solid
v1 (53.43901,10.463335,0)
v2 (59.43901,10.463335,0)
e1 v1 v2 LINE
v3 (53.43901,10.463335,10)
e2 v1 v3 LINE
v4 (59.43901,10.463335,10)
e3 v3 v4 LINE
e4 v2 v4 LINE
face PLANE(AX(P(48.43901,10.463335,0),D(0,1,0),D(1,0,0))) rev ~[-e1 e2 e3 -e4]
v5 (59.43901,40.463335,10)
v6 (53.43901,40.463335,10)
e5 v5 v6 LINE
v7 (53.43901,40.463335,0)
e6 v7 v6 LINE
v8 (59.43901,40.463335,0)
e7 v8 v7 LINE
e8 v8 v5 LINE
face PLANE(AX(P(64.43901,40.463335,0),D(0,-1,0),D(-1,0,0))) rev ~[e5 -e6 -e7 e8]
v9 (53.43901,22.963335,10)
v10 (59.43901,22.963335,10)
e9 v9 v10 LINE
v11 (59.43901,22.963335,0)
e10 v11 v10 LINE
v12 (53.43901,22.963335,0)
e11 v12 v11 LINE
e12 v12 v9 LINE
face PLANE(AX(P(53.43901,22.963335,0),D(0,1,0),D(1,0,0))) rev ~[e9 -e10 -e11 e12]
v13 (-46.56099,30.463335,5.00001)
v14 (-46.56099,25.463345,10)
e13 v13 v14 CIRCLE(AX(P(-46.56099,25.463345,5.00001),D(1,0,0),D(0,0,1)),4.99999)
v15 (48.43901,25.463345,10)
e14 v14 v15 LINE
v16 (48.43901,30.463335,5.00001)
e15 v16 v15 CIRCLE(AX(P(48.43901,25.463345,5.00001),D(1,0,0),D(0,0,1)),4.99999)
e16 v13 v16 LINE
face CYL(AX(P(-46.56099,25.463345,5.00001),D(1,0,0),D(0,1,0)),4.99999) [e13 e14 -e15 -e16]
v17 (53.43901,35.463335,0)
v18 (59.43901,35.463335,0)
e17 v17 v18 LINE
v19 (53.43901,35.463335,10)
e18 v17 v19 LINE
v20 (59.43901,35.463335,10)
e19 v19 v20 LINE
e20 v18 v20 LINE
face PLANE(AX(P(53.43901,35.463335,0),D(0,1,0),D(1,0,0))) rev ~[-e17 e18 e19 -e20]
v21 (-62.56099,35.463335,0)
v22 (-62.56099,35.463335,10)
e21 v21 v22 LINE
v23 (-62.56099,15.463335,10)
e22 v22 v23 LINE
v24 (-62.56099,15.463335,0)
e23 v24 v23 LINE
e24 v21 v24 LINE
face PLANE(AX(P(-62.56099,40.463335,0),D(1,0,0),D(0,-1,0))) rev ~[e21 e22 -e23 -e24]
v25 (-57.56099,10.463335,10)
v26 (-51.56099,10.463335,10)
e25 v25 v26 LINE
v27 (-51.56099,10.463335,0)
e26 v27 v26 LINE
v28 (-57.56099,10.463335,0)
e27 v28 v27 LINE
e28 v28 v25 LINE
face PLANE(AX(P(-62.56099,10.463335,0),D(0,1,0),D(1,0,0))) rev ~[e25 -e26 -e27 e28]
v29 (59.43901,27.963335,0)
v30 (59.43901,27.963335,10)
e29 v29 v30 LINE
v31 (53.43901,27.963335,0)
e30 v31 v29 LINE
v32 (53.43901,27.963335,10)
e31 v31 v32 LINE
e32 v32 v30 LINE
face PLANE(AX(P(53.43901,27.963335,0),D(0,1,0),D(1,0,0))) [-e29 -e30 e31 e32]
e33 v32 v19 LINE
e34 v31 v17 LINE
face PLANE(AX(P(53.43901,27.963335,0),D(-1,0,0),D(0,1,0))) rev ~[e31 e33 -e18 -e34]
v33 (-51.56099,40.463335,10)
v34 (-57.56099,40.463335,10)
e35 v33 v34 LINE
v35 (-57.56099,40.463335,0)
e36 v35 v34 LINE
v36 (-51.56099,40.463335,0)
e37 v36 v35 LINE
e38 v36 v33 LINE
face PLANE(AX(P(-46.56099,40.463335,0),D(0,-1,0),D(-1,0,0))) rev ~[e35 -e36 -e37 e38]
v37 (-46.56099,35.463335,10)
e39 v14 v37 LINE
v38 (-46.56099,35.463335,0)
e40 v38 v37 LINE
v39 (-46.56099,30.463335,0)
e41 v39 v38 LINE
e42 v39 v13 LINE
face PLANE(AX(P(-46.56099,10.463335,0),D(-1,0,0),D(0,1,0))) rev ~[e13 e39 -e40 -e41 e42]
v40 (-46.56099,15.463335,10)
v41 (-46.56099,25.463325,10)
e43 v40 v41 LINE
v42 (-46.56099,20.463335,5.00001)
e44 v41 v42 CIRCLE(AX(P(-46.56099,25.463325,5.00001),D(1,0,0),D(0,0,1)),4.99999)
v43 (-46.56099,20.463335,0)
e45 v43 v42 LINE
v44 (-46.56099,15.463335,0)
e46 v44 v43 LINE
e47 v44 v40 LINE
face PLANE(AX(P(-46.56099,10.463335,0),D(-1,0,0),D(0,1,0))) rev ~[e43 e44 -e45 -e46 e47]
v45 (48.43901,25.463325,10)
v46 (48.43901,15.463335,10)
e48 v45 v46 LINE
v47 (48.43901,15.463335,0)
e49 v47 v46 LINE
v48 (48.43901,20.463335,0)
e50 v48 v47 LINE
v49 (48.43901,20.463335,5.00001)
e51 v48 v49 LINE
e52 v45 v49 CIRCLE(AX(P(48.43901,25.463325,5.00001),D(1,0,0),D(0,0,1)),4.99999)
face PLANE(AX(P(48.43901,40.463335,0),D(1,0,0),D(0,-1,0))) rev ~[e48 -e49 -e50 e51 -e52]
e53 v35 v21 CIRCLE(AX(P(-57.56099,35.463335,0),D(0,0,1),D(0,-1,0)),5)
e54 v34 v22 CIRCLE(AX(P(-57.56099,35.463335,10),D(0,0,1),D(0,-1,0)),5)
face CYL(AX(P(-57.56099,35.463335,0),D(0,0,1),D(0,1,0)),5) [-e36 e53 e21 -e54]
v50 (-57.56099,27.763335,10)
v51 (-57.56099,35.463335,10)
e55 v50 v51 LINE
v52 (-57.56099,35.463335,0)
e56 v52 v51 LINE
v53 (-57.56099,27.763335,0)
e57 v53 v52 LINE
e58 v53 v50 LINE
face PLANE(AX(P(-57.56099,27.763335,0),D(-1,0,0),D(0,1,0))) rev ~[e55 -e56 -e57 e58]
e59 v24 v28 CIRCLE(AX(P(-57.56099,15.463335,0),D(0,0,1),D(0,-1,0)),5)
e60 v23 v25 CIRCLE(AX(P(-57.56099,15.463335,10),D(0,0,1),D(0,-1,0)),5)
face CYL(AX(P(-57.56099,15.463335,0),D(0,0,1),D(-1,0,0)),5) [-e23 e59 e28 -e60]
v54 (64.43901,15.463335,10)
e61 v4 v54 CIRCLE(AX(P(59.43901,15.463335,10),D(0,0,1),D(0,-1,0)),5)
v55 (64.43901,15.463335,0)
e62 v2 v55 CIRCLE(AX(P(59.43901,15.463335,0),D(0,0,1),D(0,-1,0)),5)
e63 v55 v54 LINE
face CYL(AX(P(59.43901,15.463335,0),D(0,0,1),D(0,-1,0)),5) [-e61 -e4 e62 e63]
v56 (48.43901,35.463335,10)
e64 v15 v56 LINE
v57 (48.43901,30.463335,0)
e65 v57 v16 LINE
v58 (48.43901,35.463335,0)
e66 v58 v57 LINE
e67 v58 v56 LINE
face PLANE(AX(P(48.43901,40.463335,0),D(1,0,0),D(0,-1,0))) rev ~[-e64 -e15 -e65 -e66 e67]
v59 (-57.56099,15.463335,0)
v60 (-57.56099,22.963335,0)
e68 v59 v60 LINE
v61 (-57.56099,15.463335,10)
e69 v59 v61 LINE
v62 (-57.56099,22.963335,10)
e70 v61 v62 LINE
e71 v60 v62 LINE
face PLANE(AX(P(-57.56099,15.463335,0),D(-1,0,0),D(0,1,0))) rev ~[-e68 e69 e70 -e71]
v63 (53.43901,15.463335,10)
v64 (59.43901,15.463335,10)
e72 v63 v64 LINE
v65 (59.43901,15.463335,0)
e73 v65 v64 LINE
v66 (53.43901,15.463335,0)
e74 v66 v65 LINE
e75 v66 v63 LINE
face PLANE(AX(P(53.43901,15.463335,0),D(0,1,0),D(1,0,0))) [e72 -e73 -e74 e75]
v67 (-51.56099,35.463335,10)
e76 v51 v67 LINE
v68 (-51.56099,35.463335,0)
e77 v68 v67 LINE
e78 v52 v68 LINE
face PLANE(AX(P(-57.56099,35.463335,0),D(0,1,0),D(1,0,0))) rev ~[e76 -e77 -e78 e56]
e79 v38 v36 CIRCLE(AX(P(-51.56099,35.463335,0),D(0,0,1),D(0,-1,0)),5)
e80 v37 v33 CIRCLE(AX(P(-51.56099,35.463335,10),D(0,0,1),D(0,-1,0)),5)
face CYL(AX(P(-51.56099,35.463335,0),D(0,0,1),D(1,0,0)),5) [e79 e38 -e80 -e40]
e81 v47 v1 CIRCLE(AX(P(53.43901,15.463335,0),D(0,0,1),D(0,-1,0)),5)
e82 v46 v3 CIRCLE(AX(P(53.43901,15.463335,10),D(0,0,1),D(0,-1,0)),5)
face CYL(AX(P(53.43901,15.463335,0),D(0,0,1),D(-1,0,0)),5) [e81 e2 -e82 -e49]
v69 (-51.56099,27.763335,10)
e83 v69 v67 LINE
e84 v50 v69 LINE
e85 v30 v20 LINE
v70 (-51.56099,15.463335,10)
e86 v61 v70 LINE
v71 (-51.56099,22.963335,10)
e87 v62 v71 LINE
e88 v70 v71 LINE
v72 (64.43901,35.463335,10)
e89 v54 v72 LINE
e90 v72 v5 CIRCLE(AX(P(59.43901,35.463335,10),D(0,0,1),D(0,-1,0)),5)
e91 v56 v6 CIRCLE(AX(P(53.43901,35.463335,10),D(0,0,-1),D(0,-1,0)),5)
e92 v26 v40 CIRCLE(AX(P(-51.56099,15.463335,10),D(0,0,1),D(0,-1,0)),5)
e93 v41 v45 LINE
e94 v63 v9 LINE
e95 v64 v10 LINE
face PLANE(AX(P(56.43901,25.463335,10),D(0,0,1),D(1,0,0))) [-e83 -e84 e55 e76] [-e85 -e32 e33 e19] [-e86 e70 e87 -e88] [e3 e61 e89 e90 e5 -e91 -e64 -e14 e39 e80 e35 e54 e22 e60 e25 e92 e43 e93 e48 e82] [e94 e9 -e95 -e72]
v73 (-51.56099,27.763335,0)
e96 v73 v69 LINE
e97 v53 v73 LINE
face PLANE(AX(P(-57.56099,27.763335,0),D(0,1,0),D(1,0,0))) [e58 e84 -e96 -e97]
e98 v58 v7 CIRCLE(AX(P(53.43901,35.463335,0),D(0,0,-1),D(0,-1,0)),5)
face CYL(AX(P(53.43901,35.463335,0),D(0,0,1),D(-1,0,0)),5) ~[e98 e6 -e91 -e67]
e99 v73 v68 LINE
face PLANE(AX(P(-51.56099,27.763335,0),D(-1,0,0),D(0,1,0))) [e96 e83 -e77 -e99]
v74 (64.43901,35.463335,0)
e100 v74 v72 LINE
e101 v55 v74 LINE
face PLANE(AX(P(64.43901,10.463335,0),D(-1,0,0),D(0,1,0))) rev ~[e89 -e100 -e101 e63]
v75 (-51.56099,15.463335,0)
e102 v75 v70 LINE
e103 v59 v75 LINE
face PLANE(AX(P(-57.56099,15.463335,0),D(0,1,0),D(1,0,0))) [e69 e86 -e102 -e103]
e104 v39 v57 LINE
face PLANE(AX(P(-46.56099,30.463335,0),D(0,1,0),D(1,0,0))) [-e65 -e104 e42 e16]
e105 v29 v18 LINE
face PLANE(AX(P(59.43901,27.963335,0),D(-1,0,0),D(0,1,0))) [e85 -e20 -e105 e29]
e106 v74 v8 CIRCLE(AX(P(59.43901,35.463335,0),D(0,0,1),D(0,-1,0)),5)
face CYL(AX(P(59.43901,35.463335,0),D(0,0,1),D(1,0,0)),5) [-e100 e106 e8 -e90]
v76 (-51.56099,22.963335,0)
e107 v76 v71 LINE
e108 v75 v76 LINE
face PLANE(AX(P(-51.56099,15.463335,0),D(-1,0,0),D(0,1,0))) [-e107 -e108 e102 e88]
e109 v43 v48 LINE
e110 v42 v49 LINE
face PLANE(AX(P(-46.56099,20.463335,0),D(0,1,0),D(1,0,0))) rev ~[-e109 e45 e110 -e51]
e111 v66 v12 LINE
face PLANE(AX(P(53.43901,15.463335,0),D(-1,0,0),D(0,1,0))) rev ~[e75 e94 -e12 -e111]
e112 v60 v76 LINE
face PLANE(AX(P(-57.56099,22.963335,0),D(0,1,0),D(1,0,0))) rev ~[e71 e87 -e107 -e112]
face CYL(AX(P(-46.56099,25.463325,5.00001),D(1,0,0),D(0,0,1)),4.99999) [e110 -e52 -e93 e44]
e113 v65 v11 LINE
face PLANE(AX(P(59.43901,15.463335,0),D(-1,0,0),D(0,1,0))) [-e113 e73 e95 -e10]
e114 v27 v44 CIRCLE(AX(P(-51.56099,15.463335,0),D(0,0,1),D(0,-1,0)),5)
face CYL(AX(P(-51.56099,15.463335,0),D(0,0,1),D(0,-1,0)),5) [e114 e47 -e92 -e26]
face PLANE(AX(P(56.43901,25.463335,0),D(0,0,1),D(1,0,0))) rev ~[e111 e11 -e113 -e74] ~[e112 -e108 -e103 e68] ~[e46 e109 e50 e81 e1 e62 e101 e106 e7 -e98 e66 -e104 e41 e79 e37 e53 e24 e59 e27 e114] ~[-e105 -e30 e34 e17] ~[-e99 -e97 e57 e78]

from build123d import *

# Parameters (mm, degrees)
F0_W     = 6
F0_H     = 7.5
F0_H_2   = 7.7
F1_DEPTH = 10
F0_W_2   = 95
F0_H_3   = 10
F2_DEPTH = 10
F3_R     = 4.99999
F4_R     = 5


# Not quite as in the source:
# - a fillet or chamfer is up to 0.001 mm smaller than in the source, because OpenCascade refuses the exact size


with BuildPart() as f1:
    # F0 (on Top) → F1 (new body)
    with BuildSketch(Plane.XY):
        Polygon((-46.5609904528, 20.46333462), (-46.5609904528, 30.46333462), (-46.5609904528, 40.46333462), (-62.5609904528, 40.46333462), (-62.5609904528, 10.46333462), (-46.5609904528, 10.46333462), align=None)
        with Locations((-54.5609904528, 19.21333462)):
            Rectangle(F0_W, F0_H, mode=Mode.SUBTRACT)
        with Locations((-54.5609904528, 31.61333462)):
            Rectangle(F0_W, F0_H_2, mode=Mode.SUBTRACT)
    extrude(amount=F1_DEPTH)



with BuildPart() as f1b:
    # F0 (on Top) → F1, piece 2 (new body)
    with BuildSketch(Plane.XY):
        Polygon((48.4390095472, 40.46333462), (48.4390095472, 30.46333462), (48.4390095472, 20.46333462), (48.4390095472, 10.46333462), (64.4390095472, 10.46333462), (64.4390095472, 40.46333462), align=None)
        with Locations((56.4390095472, 19.21333462)):
            Rectangle(F0_W, F0_H, mode=Mode.SUBTRACT)
        with Locations((56.4390095472, 31.71333462)):
            Rectangle(F0_W, F0_H, mode=Mode.SUBTRACT)
    extrude(amount=F1_DEPTH)


with BuildPart() as f1_1:
    add(f1.part)

    add(f1b.part)  # F2 merges F1b
    # F0 (on Top) → F2 (join)
    with BuildSketch(Plane.XY):
        with Locations((0.9390095472, 25.46333462)):
            Rectangle(F0_W_2, F0_H_3)
    extrude(amount=F2_DEPTH)

    # F3 (radius 5 in the source; OpenCascade refuses exactly that, so slightly less here)
    f3_edges = [f1_1.edges().sort_by_distance(p)[0] for p in [
        (0.93901, 20.463335, 10),
        (0.93901, 30.463335, 10),
    ]]
    fillet(f3_edges, radius=F3_R)

    # F4
    f4_edges = [f1_1.edges().sort_by_distance(p)[0] for p in [
        (-62.56099, 10.463335, 5),
        (-46.56099, 10.463335, 5),
        (48.43901, 10.463335, 5),
        (64.43901, 10.463335, 5),
        (64.43901, 40.463335, 5),
        (48.43901, 40.463335, 5),
        (-46.56099, 40.463335, 5),
        (-62.56099, 40.463335, 5),
    ]]
    fillet(f4_edges, radius=F4_R)


solid = f1_1.part
